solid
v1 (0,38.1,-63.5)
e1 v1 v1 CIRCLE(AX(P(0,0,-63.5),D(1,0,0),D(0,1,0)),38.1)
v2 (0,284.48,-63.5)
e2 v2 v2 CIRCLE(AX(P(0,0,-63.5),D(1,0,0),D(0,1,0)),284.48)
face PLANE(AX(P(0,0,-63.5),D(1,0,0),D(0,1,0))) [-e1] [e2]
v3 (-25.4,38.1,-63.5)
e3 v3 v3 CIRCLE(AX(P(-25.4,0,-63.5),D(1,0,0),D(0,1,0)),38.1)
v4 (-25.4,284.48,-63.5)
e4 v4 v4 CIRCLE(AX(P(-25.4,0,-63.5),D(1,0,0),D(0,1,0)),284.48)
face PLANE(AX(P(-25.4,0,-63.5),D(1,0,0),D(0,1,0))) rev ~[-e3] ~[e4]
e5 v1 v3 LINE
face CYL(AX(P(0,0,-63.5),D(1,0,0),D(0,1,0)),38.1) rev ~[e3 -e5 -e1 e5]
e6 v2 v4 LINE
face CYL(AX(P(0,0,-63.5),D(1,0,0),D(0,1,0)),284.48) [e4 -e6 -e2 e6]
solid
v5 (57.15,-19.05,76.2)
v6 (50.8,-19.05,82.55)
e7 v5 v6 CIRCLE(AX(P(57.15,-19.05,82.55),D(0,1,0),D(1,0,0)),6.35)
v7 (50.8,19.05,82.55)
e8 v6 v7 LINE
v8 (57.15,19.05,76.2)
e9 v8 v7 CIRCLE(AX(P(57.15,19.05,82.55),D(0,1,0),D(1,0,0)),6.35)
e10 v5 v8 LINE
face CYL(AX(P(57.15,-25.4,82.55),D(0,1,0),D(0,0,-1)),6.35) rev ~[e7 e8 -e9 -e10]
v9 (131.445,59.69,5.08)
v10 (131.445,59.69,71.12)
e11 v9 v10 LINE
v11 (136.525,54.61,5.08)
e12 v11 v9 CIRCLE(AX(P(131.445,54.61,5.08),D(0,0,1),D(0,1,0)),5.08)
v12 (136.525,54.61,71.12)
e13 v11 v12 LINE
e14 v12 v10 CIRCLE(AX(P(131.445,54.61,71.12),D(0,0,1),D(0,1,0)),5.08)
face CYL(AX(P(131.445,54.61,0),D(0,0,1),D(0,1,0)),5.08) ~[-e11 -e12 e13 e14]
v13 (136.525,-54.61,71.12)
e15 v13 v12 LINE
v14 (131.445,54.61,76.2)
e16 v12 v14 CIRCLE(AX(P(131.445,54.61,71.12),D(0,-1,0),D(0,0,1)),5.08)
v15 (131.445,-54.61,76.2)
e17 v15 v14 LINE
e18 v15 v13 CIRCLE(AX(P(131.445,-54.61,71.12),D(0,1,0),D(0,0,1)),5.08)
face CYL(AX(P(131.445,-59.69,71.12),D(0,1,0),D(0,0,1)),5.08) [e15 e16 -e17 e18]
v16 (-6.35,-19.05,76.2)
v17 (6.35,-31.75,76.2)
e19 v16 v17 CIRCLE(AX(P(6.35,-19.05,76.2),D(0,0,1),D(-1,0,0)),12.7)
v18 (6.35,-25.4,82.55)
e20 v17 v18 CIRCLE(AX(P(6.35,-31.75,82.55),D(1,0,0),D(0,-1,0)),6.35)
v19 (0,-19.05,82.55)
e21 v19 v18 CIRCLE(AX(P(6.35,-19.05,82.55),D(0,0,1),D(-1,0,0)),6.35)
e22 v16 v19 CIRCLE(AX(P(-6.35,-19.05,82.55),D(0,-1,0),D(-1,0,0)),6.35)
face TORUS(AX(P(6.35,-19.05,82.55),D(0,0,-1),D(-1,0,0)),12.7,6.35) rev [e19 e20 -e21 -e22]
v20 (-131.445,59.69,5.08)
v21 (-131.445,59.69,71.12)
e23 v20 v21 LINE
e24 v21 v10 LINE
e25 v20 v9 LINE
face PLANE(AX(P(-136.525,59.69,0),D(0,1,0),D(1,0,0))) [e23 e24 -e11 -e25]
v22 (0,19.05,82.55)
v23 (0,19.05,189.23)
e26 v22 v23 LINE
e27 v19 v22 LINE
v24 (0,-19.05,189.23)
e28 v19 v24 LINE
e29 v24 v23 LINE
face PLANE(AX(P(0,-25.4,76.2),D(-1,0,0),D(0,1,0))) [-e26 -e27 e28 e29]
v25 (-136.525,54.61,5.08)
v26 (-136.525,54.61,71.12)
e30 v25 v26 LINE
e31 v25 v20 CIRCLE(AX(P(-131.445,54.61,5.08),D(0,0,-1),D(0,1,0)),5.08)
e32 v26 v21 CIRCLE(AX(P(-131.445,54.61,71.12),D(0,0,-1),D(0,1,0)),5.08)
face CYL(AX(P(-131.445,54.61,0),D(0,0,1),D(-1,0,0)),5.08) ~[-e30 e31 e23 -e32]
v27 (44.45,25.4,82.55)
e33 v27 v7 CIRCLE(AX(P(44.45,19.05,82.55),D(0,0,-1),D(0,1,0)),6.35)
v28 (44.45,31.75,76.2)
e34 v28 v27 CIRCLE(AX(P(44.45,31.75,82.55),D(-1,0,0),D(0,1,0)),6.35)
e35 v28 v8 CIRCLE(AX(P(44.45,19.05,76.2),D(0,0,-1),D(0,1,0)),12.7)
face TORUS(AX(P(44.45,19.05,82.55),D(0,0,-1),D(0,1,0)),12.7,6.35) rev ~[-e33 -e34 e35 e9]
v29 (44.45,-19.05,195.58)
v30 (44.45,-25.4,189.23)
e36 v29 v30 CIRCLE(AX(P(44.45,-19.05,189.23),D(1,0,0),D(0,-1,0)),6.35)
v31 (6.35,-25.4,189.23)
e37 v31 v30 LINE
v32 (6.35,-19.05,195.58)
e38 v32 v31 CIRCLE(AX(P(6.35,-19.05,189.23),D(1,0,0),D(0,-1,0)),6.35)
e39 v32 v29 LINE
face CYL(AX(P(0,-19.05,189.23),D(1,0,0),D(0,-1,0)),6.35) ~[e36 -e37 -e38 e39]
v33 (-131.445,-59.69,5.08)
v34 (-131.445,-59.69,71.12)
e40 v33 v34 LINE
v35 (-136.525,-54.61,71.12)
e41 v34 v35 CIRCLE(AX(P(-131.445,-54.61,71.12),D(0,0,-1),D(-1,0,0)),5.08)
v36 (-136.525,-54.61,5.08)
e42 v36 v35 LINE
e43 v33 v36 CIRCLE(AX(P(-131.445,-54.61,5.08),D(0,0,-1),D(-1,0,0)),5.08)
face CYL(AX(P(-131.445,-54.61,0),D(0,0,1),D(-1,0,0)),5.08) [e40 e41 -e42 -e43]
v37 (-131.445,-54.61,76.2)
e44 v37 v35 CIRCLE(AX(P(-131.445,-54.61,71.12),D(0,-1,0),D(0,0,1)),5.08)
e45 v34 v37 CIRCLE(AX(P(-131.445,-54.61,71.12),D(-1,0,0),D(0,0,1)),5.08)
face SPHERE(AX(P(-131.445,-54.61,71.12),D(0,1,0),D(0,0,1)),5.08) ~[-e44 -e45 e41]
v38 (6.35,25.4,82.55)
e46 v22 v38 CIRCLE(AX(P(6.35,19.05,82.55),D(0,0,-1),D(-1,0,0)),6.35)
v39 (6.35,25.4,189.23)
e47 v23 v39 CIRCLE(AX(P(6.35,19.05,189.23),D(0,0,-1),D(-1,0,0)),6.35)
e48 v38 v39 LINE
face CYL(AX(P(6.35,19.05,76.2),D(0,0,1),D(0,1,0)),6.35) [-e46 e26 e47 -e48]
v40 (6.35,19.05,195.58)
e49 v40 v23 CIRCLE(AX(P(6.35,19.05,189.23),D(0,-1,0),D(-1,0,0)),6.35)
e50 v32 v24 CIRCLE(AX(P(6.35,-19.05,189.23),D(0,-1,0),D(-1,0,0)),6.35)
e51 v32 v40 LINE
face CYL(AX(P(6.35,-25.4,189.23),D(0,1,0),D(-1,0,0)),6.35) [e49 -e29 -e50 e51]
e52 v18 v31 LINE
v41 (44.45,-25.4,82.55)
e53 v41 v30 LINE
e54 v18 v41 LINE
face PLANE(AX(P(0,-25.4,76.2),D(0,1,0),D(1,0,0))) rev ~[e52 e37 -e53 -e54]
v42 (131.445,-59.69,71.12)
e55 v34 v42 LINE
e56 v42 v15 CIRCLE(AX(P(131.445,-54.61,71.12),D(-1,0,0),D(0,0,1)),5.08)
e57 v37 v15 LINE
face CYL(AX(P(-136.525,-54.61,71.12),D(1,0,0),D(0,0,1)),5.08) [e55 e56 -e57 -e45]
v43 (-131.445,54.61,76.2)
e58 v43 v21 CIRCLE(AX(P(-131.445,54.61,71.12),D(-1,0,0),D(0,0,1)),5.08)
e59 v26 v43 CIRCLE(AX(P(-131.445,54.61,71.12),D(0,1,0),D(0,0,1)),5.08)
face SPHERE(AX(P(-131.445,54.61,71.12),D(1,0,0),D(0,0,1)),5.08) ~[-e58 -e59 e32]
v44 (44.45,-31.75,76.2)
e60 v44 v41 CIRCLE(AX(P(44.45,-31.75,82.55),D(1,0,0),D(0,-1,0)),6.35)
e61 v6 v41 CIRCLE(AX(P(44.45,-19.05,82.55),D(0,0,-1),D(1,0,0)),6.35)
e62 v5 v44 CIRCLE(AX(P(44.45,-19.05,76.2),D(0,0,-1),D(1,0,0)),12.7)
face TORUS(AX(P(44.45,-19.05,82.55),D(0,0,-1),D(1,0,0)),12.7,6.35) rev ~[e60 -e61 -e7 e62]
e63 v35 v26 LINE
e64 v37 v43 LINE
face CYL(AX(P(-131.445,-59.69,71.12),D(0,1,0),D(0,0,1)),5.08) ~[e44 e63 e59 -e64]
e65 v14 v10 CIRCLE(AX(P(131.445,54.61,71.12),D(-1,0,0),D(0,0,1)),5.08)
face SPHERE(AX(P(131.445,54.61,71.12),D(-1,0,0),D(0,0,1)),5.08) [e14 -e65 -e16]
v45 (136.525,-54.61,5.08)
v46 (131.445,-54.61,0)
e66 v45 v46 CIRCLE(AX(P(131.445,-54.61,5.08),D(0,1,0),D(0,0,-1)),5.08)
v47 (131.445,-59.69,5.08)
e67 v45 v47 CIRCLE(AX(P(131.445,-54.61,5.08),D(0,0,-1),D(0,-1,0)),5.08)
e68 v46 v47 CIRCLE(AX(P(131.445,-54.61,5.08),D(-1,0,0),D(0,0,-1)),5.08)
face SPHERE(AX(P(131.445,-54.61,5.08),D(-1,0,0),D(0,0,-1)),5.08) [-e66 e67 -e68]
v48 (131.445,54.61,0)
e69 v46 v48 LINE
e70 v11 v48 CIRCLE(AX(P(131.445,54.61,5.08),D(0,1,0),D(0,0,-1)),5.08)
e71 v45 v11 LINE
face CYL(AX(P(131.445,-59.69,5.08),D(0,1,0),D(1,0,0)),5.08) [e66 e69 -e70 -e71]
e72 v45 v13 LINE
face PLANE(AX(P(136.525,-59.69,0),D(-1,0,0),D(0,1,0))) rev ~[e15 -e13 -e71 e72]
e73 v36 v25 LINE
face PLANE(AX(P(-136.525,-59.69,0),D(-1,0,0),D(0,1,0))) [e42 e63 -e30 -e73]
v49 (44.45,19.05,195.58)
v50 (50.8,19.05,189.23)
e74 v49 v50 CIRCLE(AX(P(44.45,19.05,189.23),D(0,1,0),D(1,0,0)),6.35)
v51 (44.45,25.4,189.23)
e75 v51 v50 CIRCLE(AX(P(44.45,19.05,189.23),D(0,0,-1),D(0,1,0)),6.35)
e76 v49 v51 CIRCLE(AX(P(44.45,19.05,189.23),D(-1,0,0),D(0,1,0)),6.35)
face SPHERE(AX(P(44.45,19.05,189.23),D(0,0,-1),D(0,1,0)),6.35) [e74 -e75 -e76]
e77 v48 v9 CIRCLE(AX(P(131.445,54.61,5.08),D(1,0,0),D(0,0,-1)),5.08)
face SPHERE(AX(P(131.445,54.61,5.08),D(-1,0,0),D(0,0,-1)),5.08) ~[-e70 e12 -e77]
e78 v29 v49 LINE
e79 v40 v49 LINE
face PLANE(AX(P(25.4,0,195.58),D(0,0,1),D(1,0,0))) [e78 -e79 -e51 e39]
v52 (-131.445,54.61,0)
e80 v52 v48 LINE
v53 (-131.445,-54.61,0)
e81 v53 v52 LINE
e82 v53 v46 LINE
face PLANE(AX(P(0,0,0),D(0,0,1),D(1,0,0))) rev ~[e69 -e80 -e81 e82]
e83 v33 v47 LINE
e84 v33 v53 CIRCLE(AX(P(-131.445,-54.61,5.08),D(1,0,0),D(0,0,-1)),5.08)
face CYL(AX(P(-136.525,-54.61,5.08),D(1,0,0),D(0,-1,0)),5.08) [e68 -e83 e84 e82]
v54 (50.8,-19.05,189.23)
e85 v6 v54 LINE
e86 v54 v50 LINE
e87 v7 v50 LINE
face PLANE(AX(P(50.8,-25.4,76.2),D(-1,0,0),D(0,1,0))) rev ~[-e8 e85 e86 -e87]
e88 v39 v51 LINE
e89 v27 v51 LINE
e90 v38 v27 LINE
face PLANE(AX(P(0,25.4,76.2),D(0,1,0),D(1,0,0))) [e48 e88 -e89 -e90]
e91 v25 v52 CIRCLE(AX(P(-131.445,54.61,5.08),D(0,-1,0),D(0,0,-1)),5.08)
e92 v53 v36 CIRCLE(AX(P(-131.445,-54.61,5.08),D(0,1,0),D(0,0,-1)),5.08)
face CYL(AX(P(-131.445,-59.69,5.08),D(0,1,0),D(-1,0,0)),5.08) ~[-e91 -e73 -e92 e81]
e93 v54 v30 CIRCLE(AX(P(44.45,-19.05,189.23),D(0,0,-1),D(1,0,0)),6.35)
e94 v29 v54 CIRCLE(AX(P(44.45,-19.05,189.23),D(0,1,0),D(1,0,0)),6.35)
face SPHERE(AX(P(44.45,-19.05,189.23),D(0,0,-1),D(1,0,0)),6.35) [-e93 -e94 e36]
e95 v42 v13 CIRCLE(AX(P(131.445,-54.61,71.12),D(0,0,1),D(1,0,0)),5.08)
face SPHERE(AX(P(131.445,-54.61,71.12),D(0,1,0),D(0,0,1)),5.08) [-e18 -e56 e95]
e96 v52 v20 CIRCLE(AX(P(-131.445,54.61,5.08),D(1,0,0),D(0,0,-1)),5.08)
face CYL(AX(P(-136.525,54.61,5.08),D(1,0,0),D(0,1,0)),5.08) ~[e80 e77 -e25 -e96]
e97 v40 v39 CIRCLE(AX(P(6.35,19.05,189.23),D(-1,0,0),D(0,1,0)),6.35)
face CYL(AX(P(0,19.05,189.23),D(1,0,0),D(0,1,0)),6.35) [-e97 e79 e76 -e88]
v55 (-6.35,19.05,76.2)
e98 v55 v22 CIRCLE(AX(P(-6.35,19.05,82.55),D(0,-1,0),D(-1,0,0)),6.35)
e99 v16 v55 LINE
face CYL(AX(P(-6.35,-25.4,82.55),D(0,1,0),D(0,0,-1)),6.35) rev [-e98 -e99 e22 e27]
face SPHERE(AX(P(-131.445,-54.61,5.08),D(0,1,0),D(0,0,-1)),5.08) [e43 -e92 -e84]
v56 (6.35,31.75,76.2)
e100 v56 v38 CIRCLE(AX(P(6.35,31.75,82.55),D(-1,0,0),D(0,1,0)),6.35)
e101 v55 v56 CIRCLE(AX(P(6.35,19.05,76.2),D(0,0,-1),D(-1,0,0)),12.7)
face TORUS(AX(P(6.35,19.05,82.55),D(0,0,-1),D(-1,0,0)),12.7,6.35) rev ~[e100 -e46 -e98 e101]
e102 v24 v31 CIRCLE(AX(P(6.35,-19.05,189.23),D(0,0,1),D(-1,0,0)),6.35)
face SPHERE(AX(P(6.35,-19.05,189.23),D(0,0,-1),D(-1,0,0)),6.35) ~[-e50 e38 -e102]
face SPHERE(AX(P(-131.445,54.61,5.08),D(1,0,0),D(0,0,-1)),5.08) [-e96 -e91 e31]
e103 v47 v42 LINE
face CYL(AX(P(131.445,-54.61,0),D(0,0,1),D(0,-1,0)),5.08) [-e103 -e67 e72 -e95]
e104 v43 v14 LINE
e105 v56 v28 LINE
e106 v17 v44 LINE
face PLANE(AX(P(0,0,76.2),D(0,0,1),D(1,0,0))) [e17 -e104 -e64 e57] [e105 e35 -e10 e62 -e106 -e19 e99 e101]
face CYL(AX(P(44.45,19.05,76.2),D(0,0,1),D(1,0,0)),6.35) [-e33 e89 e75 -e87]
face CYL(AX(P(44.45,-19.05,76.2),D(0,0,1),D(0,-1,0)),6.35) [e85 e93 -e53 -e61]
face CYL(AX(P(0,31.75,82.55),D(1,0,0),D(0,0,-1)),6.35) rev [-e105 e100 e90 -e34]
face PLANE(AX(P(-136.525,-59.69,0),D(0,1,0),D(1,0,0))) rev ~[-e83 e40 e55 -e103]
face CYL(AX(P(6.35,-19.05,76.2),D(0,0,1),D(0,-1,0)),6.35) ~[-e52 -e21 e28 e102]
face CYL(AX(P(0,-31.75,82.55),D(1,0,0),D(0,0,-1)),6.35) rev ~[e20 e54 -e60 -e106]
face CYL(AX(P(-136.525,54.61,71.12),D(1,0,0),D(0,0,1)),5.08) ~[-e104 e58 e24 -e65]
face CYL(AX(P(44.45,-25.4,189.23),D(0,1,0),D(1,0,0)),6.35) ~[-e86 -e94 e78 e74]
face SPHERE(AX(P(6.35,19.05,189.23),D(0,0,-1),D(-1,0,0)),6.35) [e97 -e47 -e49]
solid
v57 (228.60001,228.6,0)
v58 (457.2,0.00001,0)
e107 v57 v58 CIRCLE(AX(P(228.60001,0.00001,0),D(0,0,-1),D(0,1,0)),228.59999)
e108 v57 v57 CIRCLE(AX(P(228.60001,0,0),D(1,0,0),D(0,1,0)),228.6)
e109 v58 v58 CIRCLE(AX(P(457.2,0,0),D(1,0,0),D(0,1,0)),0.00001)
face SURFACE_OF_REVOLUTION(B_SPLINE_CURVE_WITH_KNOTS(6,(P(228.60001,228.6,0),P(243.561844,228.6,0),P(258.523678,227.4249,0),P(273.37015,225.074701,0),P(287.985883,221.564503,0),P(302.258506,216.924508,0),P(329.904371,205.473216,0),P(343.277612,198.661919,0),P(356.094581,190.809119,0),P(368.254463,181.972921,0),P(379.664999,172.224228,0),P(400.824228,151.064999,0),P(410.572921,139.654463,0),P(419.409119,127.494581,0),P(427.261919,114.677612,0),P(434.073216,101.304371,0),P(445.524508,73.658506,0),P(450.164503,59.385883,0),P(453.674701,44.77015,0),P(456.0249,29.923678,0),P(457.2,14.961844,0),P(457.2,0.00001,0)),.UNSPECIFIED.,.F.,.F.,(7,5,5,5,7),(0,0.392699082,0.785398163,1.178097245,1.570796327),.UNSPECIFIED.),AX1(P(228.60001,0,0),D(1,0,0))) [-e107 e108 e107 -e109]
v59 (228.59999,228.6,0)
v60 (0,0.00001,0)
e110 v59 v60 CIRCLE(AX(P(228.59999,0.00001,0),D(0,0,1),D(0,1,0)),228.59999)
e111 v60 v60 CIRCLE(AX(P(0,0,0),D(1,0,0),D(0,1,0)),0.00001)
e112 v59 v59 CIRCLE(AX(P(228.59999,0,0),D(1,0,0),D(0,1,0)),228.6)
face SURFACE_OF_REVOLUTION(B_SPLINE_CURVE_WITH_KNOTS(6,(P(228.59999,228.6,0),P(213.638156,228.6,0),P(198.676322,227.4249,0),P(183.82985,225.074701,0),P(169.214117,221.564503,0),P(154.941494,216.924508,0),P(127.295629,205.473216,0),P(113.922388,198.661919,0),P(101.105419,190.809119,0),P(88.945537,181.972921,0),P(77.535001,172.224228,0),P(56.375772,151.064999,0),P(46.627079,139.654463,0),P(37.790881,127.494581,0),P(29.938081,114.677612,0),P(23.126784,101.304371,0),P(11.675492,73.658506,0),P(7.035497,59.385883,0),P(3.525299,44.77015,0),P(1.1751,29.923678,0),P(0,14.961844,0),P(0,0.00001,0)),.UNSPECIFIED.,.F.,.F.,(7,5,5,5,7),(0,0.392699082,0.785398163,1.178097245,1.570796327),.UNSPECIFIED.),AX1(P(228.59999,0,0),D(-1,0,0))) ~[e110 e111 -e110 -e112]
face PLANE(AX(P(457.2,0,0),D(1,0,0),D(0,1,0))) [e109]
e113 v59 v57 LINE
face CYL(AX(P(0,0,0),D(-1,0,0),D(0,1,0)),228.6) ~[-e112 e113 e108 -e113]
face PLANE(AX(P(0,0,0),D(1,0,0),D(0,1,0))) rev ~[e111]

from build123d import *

# Parameters (mm, degrees)
F0_W     = 273.05
F0_H     = 119.38
F1_DEPTH = 76.2
F2_W     = 50.8
F2_H     = 50.8
F3_DEPTH = 119.38
F4_R     = 6.35
F5_R     = 5.08
F6_R     = 284.48
F6_R_2   = 38.1
F7_DEPTH = 25.4
F8_R     = 228.6
F9_DEPTH = 457.2
F10_R    = 228.59999


# Not quite as in the source:
# - a fillet or chamfer is up to 0.001 mm smaller than in the source, because OpenCascade refuses the exact size


with BuildPart() as f1:
    # F0 (on Top) → F1 (new body)
    with BuildSketch(Plane.XY):
        Rectangle(F0_W, F0_H)
    extrude(amount=F1_DEPTH)

    # F2 (on face) → F3 (join)
    with BuildSketch(Plane.XY.offset(76.2)):
        with Locations((25.4, 0)):
            Rectangle(F2_W, F2_H)
    extrude(amount=F3_DEPTH)

    # F4
    f4_edges = [f1.edges().sort_by_distance(p)[0] for p in [
        (0, 25.4, 135.89),
        (0, -25.4, 135.89),
        (0, 0, 76.2),
        (0, 0, 195.58),
        (50.8, 25.4, 135.89),
        (25.4, 25.4, 76.2),
        (25.4, 25.4, 195.58),
        (50.8, -25.4, 135.89),
        (50.8, 0, 76.2),
        (50.8, 0, 195.58),
        (25.4, -25.4, 76.2),
        (25.4, -25.4, 195.58),
    ]]
    fillet(f4_edges, radius=F4_R)

    # F5
    f5_edges = [f1.edges().sort_by_distance(p)[0] for p in [
        (-6.35, 0, 76.2),
        (-2.630256, 28.030256, 76.2),
        (-2.630256, -28.030256, 76.2),
        (25.4, 31.75, 76.2),
        (25.4, -31.75, 76.2),
        (53.430256, 28.030256, 76.2),
        (53.430256, -28.030256, 76.2),
        (57.15, 0, 76.2),
        (0, 59.69, 76.2),
        (136.525, 0, 76.2),
        (-136.525, 0, 76.2),
        (0, -59.69, 76.2),
        (0, 59.69, 0),
        (-136.525, 0, 0),
        (0, -59.69, 0),
        (136.525, 0, 0),
        (-136.525, -59.69, 38.1),
        (136.525, -59.69, 38.1),
        (136.525, 59.69, 38.1),
        (-136.525, 59.69, 38.1),
    ]]
    fillet(f5_edges, radius=F5_R)


with BuildPart() as f7:
    # F6 (on Right) → F7 (new body)
    with BuildSketch(Plane.YZ):
        with Locations((0, -63.5)):
            Circle(F6_R)
        with Locations((0, -63.5)):
            Circle(F6_R_2, mode=Mode.SUBTRACT)
    extrude(amount=-F7_DEPTH)


with BuildPart() as f9:
    # F8 (on Right) → F9 (new body)
    with BuildSketch(Plane.YZ):
        Circle(F8_R)
    extrude(amount=F9_DEPTH)

    # F10 (radius 228.6 in the source; OpenCascade refuses exactly that, so slightly less here)
    f10_edges = [f9.edges().sort_by_distance(p)[0] for p in [
        (457.2, -228.6, 0),
        (0, -228.6, 0),
    ]]
    fillet(f10_edges, radius=F10_R)


solid = Compound([f1.part, f7.part, f9.part])
